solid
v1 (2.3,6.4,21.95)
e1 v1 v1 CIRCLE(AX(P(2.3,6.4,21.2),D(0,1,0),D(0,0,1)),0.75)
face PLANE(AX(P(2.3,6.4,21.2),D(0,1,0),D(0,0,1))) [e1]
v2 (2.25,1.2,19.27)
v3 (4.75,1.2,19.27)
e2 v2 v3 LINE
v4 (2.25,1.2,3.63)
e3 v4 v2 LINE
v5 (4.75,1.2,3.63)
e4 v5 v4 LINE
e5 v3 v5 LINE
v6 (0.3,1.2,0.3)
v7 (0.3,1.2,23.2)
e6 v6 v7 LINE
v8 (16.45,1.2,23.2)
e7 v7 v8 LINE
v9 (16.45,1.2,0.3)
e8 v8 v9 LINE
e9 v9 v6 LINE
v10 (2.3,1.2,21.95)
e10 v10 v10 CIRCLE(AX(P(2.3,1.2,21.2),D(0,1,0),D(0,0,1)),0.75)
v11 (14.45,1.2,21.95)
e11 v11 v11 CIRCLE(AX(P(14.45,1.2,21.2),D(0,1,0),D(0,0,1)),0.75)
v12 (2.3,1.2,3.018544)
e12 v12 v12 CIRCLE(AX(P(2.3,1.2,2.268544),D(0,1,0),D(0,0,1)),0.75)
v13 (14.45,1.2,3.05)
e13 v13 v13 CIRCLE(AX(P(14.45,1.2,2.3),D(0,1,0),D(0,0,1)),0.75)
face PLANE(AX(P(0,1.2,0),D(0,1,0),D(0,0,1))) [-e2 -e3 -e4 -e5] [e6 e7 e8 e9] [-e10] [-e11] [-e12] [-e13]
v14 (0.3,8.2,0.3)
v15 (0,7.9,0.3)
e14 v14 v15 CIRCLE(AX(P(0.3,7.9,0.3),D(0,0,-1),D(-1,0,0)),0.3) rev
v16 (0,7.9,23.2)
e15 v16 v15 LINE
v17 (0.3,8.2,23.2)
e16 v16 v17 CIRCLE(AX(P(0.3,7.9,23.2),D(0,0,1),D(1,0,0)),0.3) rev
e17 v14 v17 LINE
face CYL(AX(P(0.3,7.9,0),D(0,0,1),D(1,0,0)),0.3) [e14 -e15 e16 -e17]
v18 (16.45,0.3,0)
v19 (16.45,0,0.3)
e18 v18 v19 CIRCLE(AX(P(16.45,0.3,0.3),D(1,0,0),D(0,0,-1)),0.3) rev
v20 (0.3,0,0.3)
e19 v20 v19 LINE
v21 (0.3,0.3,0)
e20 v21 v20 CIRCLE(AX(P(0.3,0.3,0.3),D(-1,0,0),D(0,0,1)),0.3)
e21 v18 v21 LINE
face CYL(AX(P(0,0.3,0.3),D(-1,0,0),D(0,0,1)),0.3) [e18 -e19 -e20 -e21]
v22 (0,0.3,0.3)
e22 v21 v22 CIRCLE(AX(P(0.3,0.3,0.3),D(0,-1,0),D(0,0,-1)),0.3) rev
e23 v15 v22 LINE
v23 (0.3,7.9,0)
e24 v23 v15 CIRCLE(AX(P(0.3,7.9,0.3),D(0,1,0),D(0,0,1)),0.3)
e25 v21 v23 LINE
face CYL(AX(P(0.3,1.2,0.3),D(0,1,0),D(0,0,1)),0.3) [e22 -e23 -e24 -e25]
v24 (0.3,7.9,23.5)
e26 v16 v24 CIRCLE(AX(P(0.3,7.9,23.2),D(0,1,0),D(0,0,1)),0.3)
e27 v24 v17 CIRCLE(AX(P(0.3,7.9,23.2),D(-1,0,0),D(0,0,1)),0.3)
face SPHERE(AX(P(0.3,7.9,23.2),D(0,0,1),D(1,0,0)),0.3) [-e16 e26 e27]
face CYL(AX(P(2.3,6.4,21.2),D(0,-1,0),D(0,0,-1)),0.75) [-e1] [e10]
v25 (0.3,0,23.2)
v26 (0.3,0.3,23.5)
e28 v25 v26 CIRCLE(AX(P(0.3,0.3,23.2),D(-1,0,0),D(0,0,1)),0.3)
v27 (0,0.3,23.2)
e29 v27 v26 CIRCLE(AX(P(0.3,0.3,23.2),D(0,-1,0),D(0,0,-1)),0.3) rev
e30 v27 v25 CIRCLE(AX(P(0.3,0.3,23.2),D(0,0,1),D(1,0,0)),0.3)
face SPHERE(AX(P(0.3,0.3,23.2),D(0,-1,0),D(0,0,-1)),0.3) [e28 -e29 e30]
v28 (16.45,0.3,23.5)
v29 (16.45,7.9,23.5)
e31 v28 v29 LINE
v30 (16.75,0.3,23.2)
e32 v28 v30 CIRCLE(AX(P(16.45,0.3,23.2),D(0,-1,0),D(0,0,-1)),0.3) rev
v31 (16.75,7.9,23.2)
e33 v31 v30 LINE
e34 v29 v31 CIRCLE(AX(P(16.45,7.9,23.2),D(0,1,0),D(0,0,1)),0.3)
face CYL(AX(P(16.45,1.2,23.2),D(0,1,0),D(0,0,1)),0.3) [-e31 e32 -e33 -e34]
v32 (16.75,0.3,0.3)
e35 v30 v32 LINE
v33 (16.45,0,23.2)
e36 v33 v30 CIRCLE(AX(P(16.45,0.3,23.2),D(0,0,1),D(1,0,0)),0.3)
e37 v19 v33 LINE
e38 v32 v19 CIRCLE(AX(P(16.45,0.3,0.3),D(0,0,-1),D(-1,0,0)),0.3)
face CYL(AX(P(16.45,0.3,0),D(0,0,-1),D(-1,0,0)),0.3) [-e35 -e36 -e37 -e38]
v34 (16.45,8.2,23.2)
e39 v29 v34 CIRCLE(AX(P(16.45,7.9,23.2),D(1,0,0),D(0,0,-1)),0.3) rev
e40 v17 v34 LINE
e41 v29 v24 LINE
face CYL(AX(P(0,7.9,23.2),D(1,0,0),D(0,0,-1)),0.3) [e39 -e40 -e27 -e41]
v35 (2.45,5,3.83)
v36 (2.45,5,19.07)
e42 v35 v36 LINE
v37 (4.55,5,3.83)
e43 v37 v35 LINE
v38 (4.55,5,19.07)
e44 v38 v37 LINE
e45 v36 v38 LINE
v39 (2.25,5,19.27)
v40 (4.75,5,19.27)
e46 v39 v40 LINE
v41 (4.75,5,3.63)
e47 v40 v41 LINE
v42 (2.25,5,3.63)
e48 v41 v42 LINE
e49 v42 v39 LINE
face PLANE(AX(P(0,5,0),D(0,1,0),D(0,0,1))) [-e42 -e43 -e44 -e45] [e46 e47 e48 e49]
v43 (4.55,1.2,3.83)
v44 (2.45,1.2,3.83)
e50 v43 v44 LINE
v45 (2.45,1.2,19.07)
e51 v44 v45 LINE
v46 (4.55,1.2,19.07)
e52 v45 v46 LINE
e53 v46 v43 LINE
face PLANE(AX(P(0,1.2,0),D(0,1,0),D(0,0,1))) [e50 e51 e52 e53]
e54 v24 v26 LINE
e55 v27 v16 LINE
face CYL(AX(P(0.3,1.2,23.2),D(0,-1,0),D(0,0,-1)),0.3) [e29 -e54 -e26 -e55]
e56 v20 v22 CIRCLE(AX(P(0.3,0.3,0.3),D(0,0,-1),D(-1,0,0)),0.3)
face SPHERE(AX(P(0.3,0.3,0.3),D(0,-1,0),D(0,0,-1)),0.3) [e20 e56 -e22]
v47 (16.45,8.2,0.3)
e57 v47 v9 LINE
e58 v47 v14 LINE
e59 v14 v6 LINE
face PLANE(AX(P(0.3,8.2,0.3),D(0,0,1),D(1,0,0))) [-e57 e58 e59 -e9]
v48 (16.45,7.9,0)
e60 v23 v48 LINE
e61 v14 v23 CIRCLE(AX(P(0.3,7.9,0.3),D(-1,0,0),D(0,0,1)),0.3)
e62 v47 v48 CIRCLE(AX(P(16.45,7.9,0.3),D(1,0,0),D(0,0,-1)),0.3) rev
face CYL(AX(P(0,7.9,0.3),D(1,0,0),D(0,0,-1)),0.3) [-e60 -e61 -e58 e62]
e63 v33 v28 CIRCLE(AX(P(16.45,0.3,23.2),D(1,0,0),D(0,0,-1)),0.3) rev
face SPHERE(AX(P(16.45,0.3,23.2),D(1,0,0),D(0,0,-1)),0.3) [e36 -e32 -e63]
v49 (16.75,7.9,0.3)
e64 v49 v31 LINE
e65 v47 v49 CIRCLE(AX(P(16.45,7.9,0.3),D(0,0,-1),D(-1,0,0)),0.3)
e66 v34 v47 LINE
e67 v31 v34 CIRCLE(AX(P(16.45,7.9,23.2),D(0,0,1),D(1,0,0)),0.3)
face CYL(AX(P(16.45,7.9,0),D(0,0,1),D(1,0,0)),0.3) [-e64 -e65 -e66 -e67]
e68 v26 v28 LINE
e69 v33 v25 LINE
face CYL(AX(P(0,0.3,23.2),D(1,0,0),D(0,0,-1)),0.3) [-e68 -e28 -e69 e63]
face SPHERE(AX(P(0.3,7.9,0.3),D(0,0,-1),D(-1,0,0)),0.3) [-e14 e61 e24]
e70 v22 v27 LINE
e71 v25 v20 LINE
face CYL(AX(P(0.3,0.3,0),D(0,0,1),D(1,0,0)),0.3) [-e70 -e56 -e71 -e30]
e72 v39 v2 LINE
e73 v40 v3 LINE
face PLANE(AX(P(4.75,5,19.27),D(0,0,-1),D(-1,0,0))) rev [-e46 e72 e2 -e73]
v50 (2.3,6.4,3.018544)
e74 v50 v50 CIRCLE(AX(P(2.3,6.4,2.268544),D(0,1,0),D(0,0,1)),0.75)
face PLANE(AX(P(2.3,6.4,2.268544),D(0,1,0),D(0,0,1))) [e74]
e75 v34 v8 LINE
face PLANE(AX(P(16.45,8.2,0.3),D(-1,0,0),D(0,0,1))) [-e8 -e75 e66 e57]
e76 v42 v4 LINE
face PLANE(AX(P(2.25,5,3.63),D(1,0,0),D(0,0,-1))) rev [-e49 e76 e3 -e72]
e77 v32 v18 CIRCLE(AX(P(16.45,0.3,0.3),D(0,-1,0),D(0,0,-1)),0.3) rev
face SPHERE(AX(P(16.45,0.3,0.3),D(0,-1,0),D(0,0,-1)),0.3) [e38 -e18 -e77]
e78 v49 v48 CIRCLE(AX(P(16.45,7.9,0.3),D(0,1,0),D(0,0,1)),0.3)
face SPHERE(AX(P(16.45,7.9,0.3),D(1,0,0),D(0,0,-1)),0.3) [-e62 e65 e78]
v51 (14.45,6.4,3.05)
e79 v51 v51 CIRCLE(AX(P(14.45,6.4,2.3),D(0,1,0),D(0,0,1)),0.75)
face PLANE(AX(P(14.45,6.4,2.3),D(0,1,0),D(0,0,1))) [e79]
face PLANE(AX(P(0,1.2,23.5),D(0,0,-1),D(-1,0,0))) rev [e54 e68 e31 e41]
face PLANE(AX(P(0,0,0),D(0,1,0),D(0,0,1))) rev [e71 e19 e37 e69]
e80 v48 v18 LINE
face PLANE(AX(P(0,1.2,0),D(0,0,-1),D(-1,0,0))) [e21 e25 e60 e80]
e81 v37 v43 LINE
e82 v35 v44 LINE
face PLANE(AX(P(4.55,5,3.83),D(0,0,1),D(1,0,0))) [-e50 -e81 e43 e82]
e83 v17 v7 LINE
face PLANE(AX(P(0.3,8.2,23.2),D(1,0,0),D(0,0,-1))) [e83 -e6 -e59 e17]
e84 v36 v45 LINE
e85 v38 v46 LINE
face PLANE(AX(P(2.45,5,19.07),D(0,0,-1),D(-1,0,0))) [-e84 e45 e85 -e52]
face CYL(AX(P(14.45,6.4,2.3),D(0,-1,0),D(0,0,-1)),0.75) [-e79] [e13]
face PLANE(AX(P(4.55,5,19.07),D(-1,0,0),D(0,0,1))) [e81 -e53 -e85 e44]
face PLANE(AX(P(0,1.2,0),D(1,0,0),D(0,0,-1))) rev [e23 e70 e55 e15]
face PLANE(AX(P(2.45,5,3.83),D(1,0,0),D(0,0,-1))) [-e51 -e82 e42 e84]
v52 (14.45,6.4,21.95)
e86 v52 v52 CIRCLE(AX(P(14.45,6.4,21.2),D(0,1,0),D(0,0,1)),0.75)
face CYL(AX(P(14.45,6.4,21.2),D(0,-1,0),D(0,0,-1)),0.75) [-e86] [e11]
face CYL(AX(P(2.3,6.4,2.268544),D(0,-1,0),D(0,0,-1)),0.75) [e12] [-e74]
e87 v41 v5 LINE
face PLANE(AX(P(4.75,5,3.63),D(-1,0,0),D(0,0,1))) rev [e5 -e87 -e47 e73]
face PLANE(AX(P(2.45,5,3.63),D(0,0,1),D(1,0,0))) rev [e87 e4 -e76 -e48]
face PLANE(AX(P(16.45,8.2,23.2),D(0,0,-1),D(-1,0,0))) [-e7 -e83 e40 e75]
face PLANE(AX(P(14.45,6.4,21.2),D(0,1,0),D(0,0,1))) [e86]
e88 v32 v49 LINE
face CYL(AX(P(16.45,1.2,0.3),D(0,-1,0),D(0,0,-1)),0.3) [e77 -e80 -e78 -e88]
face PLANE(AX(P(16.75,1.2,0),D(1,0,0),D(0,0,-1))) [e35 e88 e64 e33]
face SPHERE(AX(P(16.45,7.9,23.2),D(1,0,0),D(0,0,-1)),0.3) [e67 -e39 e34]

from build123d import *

# Parameters (mm, degrees)
SKETCH1_W           = 16.75
SKETCH1_H           = 23.5
BOSS_EXTRUDE1_DEPTH = 1.2
SKETCH3_R           = 0.75
BOSS_EXTRUDE2_DEPTH = 5.2
SKETCH5_W           = 16.75
SKETCH5_H           = 23.5
SKETCH5_W_2         = 16.15
SKETCH5_H_2         = 22.9
BOSS_EXTRUDE3_DEPTH = 7
SKETCH7_W           = 2.1
SKETCH7_H           = 15.24
BOSS_EXTRUDE5_DEPTH = 3.8
FILLET4_R           = 0.3


with BuildPart() as part:
    # Sketch1 → Boss-Extrude1 (new body)
    with BuildSketch(Plane(origin=(0, 0, 0), x_dir=(1, 0, 0), z_dir=(0, 1, 0))):
        with Locations((8.375, -11.75)):
            Rectangle(SKETCH1_W, SKETCH1_H)
    extrude(amount=BOSS_EXTRUDE1_DEPTH)

    # Sketch3 → Boss-Extrude2 (add)
    with BuildSketch(Plane(origin=(0, 1.2, 0), x_dir=(1, 0, 0), z_dir=(0, 1, 0))):
        with Locations(Location((2.3, -2.268544265, 0), (0, 0, 270))):
            Circle(SKETCH3_R)
        with Locations(Location((2.3, -21.2, 0), (0, 0, 270))):
            Circle(SKETCH3_R)
        with Locations(Location((14.45, -21.2, 0), (0, 0, 270))):
            Circle(SKETCH3_R)
        with Locations(Location((14.45, -2.3, 0), (0, 0, 270))):
            Circle(SKETCH3_R)
    extrude(amount=BOSS_EXTRUDE2_DEPTH)

    # Sketch5 → Boss-Extrude3 (add)
    with BuildSketch(Plane(origin=(0, 1.2, 0), x_dir=(1, 0, 0), z_dir=(0, 1, 0))):
        with Locations((8.375, -11.75)):
            Rectangle(SKETCH5_W, SKETCH5_H)
        with Locations((8.375, -11.75)):
            Rectangle(SKETCH5_W_2, SKETCH5_H_2, mode=Mode.SUBTRACT)
    extrude(amount=BOSS_EXTRUDE3_DEPTH)

    # Sketch7 → Boss-Extrude5 (add)
    with BuildSketch(Plane(origin=(0, 1.2, 0), x_dir=(1, 0, 0), z_dir=(0, 1, 0))):
        Polygon((2.45, -3.63), (4.55, -3.63), (4.75, -3.63), (4.75, -19.27), (2.25, -19.27), (2.25, -3.63), align=None)
        with Locations((3.5, -11.45)):
            Rectangle(SKETCH7_W, SKETCH7_H, mode=Mode.SUBTRACT)
    extrude(amount=BOSS_EXTRUDE5_DEPTH)

    # Fillet4
    fillet4_edges = [part.edges().sort_by_distance(p)[0] for p in [
        (0, 8.2, 11.75),
        (8.375, 8.2, 23.5),
        (16.75, 8.2, 11.75),
        (8.375, 8.2, 0),
        (8.375, 0, 0),
        (16.75, 0, 11.75),
        (8.375, 0, 23.5),
        (0, 0, 11.75),
        (0, 4.1, 0),
        (16.75, 4.1, 0),
        (16.75, 4.1, 23.5),
        (0, 4.1, 23.5),
    ]]
    fillet(fillet4_edges, radius=FILLET4_R - 0.0001)  # a hair under: the kernel refuses the full size


solid = part.part
